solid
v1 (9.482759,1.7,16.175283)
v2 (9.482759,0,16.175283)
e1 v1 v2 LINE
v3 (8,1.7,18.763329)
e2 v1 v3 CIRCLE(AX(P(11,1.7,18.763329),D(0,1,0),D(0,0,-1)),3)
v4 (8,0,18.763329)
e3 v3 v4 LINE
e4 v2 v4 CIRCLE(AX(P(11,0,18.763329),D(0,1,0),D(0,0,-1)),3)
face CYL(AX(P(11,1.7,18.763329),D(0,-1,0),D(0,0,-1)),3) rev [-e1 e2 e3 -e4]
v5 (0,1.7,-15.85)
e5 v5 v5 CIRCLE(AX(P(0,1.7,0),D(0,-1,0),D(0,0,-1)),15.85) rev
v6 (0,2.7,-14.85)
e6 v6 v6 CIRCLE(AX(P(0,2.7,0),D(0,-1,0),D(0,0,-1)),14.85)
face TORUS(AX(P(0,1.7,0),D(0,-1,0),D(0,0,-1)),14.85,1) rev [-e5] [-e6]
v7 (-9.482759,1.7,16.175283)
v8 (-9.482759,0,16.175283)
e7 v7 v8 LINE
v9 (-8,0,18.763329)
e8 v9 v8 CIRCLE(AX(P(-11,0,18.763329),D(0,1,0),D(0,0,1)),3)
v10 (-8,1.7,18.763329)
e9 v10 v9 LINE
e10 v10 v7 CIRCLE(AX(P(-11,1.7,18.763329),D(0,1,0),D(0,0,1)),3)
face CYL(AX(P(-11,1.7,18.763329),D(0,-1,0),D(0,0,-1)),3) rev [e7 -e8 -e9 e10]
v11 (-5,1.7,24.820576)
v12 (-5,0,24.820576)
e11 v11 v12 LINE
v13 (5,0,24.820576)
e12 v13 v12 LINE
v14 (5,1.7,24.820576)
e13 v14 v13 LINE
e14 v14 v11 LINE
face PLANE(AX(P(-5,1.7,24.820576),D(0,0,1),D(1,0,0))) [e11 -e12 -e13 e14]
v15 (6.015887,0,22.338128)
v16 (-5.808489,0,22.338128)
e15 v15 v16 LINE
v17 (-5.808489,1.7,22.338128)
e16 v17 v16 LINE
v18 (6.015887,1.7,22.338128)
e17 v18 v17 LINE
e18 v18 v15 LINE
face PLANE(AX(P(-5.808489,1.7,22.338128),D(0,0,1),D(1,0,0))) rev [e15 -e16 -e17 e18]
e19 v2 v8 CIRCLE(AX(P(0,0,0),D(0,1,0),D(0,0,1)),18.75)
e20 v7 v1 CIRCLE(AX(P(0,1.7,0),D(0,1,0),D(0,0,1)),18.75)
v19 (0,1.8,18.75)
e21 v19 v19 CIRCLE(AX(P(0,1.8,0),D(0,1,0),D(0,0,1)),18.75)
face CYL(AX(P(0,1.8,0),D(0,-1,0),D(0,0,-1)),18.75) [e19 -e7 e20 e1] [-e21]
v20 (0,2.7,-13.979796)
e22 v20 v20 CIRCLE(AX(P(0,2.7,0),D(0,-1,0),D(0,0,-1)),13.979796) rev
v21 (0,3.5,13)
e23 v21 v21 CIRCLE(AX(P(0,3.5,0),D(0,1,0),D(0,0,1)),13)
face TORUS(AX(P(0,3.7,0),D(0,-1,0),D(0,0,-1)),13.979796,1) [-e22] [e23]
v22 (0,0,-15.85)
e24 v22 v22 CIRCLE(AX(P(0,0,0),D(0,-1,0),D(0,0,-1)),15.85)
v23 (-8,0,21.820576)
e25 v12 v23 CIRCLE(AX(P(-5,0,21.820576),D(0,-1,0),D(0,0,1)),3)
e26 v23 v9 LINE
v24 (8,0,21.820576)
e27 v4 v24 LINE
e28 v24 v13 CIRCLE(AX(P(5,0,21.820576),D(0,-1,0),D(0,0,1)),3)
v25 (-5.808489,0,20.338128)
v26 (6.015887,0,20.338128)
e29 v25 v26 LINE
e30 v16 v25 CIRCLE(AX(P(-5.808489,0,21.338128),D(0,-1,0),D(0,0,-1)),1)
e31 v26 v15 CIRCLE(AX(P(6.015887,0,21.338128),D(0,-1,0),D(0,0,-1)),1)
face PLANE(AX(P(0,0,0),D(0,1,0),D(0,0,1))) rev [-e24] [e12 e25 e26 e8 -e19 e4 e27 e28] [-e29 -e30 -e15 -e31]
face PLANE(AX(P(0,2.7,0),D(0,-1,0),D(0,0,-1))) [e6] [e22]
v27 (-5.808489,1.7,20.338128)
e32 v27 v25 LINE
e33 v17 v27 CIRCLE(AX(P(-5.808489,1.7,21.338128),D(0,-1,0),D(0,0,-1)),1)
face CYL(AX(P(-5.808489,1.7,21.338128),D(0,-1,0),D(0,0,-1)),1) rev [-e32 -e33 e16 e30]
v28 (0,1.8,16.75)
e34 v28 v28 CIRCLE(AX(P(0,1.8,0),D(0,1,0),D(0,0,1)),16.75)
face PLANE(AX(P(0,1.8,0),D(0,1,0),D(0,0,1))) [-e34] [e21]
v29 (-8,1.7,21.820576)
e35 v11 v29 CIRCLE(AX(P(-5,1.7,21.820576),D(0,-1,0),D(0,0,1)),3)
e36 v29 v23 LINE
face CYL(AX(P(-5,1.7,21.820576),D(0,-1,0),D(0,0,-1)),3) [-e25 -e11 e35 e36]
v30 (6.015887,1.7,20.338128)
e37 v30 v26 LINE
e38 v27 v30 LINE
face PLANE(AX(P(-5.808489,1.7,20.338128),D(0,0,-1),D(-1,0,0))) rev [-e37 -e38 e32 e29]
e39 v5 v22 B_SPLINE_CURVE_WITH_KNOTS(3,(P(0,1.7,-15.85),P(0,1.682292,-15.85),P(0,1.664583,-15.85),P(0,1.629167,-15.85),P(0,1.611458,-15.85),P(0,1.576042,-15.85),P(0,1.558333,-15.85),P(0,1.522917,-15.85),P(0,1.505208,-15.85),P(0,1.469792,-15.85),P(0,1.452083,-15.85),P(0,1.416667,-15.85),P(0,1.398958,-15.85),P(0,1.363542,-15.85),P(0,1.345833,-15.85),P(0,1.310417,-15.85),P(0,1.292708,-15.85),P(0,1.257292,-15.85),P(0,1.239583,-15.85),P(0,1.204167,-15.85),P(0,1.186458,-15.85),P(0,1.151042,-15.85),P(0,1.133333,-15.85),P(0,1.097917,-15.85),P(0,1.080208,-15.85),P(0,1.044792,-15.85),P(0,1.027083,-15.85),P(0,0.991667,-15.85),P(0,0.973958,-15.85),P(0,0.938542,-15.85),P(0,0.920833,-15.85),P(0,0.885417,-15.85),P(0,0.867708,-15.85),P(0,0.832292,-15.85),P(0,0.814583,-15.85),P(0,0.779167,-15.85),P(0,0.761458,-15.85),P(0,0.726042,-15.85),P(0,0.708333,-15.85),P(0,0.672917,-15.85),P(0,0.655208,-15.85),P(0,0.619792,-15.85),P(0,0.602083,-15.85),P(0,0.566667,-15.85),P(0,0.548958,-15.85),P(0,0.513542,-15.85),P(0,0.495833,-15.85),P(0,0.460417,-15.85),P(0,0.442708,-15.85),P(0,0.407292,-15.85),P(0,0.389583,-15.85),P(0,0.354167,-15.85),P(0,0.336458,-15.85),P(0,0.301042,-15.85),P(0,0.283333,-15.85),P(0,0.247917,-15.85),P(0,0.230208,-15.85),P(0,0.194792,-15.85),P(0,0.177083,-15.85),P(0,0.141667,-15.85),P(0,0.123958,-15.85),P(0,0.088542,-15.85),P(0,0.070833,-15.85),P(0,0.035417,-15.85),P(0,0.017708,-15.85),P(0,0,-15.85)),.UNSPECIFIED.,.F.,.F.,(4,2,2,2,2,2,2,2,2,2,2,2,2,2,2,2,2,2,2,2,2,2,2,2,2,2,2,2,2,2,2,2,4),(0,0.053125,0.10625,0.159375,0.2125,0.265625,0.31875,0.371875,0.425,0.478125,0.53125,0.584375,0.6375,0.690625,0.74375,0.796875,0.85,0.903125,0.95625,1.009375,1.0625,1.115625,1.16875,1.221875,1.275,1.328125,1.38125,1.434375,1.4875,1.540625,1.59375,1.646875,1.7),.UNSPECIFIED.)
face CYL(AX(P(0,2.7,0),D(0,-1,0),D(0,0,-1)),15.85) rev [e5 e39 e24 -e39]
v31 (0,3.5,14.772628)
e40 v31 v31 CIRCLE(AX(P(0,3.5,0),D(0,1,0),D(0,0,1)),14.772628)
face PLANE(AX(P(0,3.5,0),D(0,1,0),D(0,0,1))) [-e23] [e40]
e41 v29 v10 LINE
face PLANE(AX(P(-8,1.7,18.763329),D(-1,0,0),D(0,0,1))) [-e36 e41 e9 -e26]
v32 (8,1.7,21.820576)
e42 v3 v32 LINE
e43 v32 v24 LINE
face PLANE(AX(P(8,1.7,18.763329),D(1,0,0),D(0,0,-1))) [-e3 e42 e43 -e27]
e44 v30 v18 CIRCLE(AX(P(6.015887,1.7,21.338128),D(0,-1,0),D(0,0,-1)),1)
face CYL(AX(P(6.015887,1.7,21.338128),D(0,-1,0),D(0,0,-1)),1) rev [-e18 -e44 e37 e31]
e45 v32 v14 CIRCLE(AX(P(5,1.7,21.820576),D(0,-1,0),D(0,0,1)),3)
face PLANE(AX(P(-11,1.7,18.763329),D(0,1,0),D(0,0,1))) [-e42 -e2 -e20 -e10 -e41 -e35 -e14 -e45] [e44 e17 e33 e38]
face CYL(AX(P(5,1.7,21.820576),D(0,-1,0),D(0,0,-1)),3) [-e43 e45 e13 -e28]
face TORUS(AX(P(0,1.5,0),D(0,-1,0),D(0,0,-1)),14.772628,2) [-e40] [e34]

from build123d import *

# Parameters (mm, degrees)
SKETCH1_R           = 18.75
BOSS_EXTRUDE1_DEPTH = 1.8
SKETCH2_R           = 16.75
BOSS_EXTRUDE2_DEPTH = 1.7
SKETCH3_R           = 13
CUT_EXTRUDE1_DEPTH  = 5.7
FILLET1_R           = 2
SKETCH4_R           = 15.85
CUT_EXTRUDE2_DEPTH  = 2.7
FILLET2_R           = 1
BOSS_EXTRUDE3_DEPTH = 1.7


with BuildPart() as part:
    # Sketch1 → Boss-Extrude1 (new body)
    with BuildSketch(Plane(origin=(0, 0, 0), x_dir=(1, 0, 0), z_dir=(0, 1, 0))):
        with Locations(Location((0, 0, 0), (0, 0, 270))):
            Circle(SKETCH1_R)
    extrude(amount=BOSS_EXTRUDE1_DEPTH)

    # Sketch2 → Boss-Extrude2 (add)
    with BuildSketch(Plane(origin=(0, 1.8, 0), x_dir=(1, 0, 0), z_dir=(0, 1, 0))):
        with Locations(Location((0, 0, 0), (0, 0, 270))):
            Circle(SKETCH2_R)
    extrude(amount=BOSS_EXTRUDE2_DEPTH)

    # Sketch3 → Cut-Extrude1 (cut)
    with BuildSketch(Plane(origin=(0, 3.5, 0), x_dir=(1, 0, 0), z_dir=(0, 1, 0))):
        with Locations(Location((0, 0, 0), (0, 0, 270))):
            Circle(SKETCH3_R)
    extrude(amount=-CUT_EXTRUDE1_DEPTH, mode=Mode.SUBTRACT)

    # Fillet1
    # the kernel refuses this fillet: 2 mm, written as the material it takes off along each edge
    with BuildSketch(Plane(origin=(0, 3.5, 0), x_dir=(0, 0, 1), z_dir=(-1, 0, 0))) as fillet1_piece_1:
        with BuildLine():
            CenterArc((14.772628007, -2), FILLET1_R, 8.626926559, 81.373073441)
            Line((14.772628007, 0), (14.772628007, 0.04))
            Line((14.772628007, 0.04), (16.75, 0.04))
            Line((16.75, 0.04), (16.79, 0))
            ThreePointArc((16.79, 0), (16.79, -0.85), (16.78954744, -1.694))
            Line((16.78954744, -1.694), (16.75, -1.7))
        make_face()
    revolve(axis=Axis((0, 3.5, 0), (0, 1, 0)), mode=Mode.SUBTRACT)

    # Sketch4 → Cut-Extrude2 (cut)
    with BuildSketch(Plane.XZ):
        with Locations(Location((0, 0, 0), (0, 0, 270))):
            Circle(SKETCH4_R)
    extrude(amount=-CUT_EXTRUDE2_DEPTH, mode=Mode.SUBTRACT)

    # Fillet2
    # the kernel refuses this fillet: 1 mm, written as the material it adds along each edge
    with BuildSketch(Plane(origin=(0, 2.7, 0), x_dir=(0, 0, -1), z_dir=(-1, 0, 0))) as fillet2_piece_1:
        with BuildLine():
            CenterArc((15.85 - FILLET2_R, FILLET2_R), FILLET2_R, 270, 90)
            Line((15.85 - FILLET2_R, 0), (15.85, 0))
            Line((15.85, 0), (15.85, FILLET2_R))
        make_face()
    revolve(axis=Axis((0, 2.7, 0), (0, -1, 0)))
    # the kernel refuses this fillet: 1 mm, written as the material it takes off along each edge
    with BuildSketch(Plane(origin=(0, 2.7, 0), x_dir=(0, 0, 1), z_dir=(-1, 0, 0))) as fillet2_2_piece_1:
        with BuildLine():
            CenterArc((13.979795897, 1), FILLET2_R, 191.536959033, 78.463040967)
            Line((13, 0.8), (13, 0))
            Line((13, 0), (13.979795897, 0))
        make_face()
    revolve(axis=Axis((0, 2.7, 0), (0, 1, 0)), mode=Mode.SUBTRACT)

    # Sketch5 → Boss-Extrude3 (add)
    with BuildSketch(Plane.XZ):
        with BuildLine():
            Line((-8, 18.763328596), (-8, 21.82057613))
            ThreePointArc((-8, 21.82057613), (-7.121320344, 23.941896474), (-5, 24.82057613))
            Line((-5, 24.82057613), (5, 24.82057613))
            ThreePointArc((5, 24.82057613), (7.121320344, 23.941896474), (8, 21.82057613))
            Line((8, 21.82057613), (8, 18.763328596))
            ThreePointArc((8, 18.763328596), (8.396951389, 17.271974201), (9.482758621, 16.175283272))
            ThreePointArc((9.482758621, 16.175283272), (0, 18.75), (-9.482758621, 16.175283272))
            ThreePointArc((-9.482758621, 16.175283272), (-8.396951389, 17.271974201), (-8, 18.763328596))
        make_face()
        with BuildLine():
            Line((-5.808489471, 22.338127717), (6.015887115, 22.338127717))
            ThreePointArc((6.015887115, 22.338127717), (7.015887115, 21.338127717), (6.015887115, 20.338127717))
            Line((6.015887115, 20.338127717), (-5.808489471, 20.338127717))
            ThreePointArc((-5.808489471, 20.338127717), (-6.808489471, 21.338127717), (-5.808489471, 22.338127717))
        make_face(mode=Mode.SUBTRACT)
    extrude(amount=-BOSS_EXTRUDE3_DEPTH)


solid = part.part
